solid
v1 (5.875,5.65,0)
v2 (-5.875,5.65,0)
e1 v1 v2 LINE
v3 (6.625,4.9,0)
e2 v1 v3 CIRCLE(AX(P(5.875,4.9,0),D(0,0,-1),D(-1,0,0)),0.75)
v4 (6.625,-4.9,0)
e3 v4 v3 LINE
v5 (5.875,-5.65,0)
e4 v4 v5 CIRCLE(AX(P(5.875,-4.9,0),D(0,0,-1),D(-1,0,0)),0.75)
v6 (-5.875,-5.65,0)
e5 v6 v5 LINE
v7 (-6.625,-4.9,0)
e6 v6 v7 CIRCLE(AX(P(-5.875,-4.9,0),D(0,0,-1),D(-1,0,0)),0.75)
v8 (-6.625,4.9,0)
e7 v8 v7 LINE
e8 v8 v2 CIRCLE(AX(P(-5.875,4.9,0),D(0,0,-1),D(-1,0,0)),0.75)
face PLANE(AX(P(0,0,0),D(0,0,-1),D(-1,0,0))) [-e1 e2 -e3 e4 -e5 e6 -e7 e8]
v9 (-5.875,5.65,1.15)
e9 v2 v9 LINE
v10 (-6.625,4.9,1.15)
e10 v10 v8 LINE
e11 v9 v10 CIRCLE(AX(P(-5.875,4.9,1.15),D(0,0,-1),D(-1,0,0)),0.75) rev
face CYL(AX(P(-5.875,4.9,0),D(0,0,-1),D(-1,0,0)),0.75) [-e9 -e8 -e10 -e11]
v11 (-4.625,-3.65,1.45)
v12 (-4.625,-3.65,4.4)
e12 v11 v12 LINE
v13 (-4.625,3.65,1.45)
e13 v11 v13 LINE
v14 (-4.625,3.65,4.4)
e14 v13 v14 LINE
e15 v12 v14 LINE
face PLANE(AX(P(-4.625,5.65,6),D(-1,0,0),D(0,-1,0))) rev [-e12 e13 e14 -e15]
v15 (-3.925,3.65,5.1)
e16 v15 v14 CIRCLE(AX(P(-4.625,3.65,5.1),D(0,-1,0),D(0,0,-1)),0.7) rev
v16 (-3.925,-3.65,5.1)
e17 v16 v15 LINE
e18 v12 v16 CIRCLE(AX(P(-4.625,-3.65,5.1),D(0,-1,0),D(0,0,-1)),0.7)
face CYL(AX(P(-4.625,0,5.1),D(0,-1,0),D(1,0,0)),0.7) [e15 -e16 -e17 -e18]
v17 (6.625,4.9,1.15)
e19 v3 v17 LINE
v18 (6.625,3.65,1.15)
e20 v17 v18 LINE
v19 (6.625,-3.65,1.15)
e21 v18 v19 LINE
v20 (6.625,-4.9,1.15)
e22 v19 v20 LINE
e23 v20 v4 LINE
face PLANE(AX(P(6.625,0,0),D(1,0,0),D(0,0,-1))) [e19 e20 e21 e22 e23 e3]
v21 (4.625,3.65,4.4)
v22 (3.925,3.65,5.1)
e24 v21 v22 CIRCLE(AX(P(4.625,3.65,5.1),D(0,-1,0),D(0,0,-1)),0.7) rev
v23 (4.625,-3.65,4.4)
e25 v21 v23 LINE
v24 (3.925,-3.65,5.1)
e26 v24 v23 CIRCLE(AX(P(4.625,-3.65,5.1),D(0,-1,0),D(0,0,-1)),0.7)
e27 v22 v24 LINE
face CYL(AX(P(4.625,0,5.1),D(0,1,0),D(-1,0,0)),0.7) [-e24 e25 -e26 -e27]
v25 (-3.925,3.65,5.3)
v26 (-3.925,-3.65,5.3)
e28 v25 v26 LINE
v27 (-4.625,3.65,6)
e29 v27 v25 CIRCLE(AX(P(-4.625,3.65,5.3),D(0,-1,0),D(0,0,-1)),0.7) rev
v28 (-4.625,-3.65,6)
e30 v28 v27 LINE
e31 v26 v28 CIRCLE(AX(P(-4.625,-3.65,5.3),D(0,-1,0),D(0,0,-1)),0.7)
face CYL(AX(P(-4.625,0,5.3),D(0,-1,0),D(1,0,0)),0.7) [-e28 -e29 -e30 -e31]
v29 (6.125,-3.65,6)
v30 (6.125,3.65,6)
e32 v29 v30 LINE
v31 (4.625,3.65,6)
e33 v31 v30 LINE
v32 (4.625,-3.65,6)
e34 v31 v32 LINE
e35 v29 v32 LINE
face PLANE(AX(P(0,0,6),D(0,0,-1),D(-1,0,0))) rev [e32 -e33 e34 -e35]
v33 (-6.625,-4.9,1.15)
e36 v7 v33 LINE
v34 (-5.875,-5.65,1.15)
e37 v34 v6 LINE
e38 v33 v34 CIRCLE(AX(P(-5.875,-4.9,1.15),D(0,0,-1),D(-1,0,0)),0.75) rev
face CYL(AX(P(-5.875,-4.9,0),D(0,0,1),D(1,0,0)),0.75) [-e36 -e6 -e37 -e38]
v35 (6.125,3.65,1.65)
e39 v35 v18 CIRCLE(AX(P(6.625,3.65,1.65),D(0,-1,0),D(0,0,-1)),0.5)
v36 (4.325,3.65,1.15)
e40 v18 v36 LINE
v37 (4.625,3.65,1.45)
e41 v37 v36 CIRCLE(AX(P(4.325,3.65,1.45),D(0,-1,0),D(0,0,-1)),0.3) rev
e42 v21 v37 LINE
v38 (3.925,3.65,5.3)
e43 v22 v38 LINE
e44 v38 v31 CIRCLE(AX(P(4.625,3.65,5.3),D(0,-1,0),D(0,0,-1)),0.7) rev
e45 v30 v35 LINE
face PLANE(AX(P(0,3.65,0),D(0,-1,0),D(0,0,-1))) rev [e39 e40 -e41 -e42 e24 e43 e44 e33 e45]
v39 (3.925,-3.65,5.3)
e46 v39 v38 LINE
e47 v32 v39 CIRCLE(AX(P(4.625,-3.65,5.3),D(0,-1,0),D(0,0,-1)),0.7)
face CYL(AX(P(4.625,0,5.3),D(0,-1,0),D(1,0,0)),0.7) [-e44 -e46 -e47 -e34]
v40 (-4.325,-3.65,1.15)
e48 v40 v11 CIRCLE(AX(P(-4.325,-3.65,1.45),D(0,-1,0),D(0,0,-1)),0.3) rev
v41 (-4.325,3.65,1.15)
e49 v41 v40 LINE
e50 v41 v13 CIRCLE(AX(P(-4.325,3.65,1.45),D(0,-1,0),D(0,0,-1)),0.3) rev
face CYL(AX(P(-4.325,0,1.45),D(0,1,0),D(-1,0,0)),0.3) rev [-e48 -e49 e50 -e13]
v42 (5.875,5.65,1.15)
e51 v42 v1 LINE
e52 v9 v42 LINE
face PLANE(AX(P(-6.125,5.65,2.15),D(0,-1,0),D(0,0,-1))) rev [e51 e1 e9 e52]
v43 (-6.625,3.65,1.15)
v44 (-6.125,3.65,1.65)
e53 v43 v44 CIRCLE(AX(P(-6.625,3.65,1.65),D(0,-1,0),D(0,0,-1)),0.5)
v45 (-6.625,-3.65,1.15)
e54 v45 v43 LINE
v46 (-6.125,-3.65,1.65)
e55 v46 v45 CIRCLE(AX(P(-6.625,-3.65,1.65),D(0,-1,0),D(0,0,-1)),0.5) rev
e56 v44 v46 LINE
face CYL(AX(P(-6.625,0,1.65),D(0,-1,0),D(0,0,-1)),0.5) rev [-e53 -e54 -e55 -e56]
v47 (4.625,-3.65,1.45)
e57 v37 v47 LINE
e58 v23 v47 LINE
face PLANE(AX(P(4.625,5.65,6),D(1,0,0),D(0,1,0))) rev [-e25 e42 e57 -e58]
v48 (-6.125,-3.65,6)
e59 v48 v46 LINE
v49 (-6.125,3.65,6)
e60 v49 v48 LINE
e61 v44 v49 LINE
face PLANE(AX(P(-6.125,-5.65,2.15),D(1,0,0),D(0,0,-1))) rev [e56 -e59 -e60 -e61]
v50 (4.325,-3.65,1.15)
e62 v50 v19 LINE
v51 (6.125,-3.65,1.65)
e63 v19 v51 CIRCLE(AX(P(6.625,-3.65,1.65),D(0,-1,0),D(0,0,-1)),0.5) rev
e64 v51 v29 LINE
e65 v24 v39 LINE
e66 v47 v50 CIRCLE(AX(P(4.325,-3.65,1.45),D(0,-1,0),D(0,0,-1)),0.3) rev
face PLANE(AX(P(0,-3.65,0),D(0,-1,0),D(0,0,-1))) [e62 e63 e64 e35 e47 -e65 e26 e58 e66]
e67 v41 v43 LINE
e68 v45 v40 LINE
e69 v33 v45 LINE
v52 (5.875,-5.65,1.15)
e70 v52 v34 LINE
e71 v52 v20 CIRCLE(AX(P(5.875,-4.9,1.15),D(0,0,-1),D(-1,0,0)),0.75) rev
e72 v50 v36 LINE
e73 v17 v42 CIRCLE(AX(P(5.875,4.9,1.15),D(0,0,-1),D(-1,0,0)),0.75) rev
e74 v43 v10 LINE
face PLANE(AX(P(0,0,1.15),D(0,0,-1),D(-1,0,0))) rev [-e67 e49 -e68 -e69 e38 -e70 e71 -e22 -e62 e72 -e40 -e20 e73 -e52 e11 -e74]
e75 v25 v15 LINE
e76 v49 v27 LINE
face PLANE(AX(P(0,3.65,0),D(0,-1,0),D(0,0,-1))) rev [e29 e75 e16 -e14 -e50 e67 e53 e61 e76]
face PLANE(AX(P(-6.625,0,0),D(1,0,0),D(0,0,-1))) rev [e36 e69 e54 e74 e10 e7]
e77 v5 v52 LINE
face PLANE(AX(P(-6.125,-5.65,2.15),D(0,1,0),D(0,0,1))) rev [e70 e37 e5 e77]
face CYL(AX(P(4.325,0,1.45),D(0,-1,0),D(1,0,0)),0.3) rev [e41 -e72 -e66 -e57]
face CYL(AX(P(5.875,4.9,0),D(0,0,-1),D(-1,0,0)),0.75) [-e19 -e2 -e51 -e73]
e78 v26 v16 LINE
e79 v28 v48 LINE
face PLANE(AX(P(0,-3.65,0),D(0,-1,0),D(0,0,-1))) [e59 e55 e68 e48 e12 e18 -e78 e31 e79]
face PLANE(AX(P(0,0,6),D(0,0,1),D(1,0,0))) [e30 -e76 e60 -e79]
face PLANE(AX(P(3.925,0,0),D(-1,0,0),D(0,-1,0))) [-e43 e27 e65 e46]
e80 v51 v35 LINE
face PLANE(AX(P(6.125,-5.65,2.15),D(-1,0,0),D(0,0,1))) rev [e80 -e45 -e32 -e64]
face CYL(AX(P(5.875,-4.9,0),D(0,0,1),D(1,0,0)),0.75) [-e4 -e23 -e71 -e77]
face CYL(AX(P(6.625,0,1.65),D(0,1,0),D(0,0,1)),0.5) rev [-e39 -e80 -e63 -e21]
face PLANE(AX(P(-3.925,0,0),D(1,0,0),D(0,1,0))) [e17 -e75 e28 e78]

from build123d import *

# Parameters (mm, degrees)
SKETCH_1_W          = 12.25
SKETCH_1_H          = 11.3
EXTRUDE_1_DEPTH     = 2.15
SKETCH_2_W          = 1.5
SKETCH_2_H          = 11.3
EXTRUDE_2_DEPTH     = 3.85
SKETCH_5_W          = 9.25
SKETCH_5_H          = 11.5
CUT_EXTRUDE_1_DEPTH = 1
SKETCH_8_W          = 1.6
SKETCH_8_H          = 11.3
EXTRUDE_5_DEPTH     = 0.7
SKETCH_9_W          = 1.6
SKETCH_9_H          = 11.3
EXTRUDE_6_DEPTH     = 0.7
FILLET_8_R          = 0.3
SKETCH_11_W         = 12.25
SKETCH_11_H         = 4.85
CUT_EXTRUDE_2_DEPTH = 2
SKETCH_12_W         = 12.25
SKETCH_12_H         = 4.85
CUT_EXTRUDE_3_DEPTH = 2
SKETCH_13_W         = 1.15
SKETCH_13_H         = 11.3
EXTRUDE_7_DEPTH     = 0.5
SKETCH_14_W         = 1.15
SKETCH_14_H         = 11.3
EXTRUDE_8_DEPTH     = 0.5
FILLET_9_R          = 0.5
FILLET_10_R         = 0.7
FILLET_11_R         = 0.75


with BuildPart() as part:
    # 스케치1 → 보스-돌출1 (new body)
    with BuildSketch(Plane.XY):
        Rectangle(SKETCH_1_W, SKETCH_1_H)
    extrude(amount=EXTRUDE_1_DEPTH)

    # 스케치2 → 보스-돌출2 (add)
    with BuildSketch(Plane.XY.offset(2.15)):
        with Locations((-5.375, 0)):
            Rectangle(SKETCH_2_W, SKETCH_2_H)
        with Locations((5.375, 0)):
            Rectangle(SKETCH_2_W, SKETCH_2_H)
    extrude(amount=EXTRUDE_2_DEPTH)

    # 스케치5 → 컷-돌출1 (cut)
    with BuildSketch(Plane.XY.offset(2.15)):
        Rectangle(SKETCH_5_W, SKETCH_5_H)
    extrude(amount=-CUT_EXTRUDE_1_DEPTH, mode=Mode.SUBTRACT)

    # 스케치8 → 보스-돌출5 (add)
    with BuildSketch(Plane(origin=(-4.625, 0, 0), x_dir=(0, 0, -1), z_dir=(1, 0, 0))):
        with Locations((-5.2, 0)):
            Rectangle(SKETCH_8_W, SKETCH_8_H)
    extrude(amount=EXTRUDE_5_DEPTH)

    # 스케치9 → 보스-돌출6 (add)
    with BuildSketch(Plane.ZY.offset(-4.625)):
        with Locations((5.2, 0)):
            Rectangle(SKETCH_9_W, SKETCH_9_H)
    extrude(amount=EXTRUDE_6_DEPTH)

    # 필렛8
    fillet_8_edges = [part.edges().sort_by_distance(p)[0] for p in [
        (4.625, 0, 1.15),
        (-4.625, 0, 1.15),
    ]]
    fillet(fillet_8_edges, radius=FILLET_8_R)

    # 스케치11 → 컷-돌출2 (cut)
    with BuildSketch(Plane(origin=(0, 5.65, 0), x_dir=(1, 0, 0), z_dir=(0, 1, 0))):
        with Locations((0, -3.575)):
            Rectangle(SKETCH_11_W, SKETCH_11_H)
    extrude(amount=-CUT_EXTRUDE_2_DEPTH, mode=Mode.SUBTRACT)

    # 스케치12 → 컷-돌출3 (cut)
    with BuildSketch(Plane.XZ.offset(5.65)):
        with Locations((0, 3.575)):
            Rectangle(SKETCH_12_W, SKETCH_12_H)
    extrude(amount=-CUT_EXTRUDE_3_DEPTH, mode=Mode.SUBTRACT)

    # 스케치13 → 보스-돌출7 (add)
    with BuildSketch(Plane(origin=(6.125, 0, 0), x_dir=(0, 0, -1), z_dir=(1, 0, 0))):
        with Locations((-0.575, 0)):
            Rectangle(SKETCH_13_W, SKETCH_13_H)
    extrude(amount=EXTRUDE_7_DEPTH)

    # 스케치14 → 보스-돌출8 (add)
    with BuildSketch(Plane.ZY.offset(6.125)):
        with Locations((0.575, 0)):
            Rectangle(SKETCH_14_W, SKETCH_14_H)
    extrude(amount=EXTRUDE_8_DEPTH)

    # 필렛9
    fillet_9_edges = [part.edges().sort_by_distance(p)[0] for p in [
        (6.125, 0, 1.15),
        (-6.125, 0, 1.15),
    ]]
    fillet(fillet_9_edges, radius=FILLET_9_R - 0.0001)  # a hair under: the kernel refuses the full size

    # 필렛10
    fillet_10_edges = [part.edges().sort_by_distance(p)[0] for p in [
        (-3.925, 0, 6),
        (-3.925, 0, 4.4),
        (3.925, 0, 4.4),
        (3.925, 0, 6),
    ]]
    fillet(fillet_10_edges, radius=FILLET_10_R - 0.0001)  # a hair under: the kernel refuses the full size

    # 필렛11
    fillet_11_edges = [part.edges().sort_by_distance(p)[0] for p in [
        (6.625, -5.65, 0.575),
        (6.625, 5.65, 0.575),
        (-6.625, 5.65, 0.575),
        (-6.625, -5.65, 0.575),
    ]]
    fillet(fillet_11_edges, radius=FILLET_11_R)


solid = part.part
